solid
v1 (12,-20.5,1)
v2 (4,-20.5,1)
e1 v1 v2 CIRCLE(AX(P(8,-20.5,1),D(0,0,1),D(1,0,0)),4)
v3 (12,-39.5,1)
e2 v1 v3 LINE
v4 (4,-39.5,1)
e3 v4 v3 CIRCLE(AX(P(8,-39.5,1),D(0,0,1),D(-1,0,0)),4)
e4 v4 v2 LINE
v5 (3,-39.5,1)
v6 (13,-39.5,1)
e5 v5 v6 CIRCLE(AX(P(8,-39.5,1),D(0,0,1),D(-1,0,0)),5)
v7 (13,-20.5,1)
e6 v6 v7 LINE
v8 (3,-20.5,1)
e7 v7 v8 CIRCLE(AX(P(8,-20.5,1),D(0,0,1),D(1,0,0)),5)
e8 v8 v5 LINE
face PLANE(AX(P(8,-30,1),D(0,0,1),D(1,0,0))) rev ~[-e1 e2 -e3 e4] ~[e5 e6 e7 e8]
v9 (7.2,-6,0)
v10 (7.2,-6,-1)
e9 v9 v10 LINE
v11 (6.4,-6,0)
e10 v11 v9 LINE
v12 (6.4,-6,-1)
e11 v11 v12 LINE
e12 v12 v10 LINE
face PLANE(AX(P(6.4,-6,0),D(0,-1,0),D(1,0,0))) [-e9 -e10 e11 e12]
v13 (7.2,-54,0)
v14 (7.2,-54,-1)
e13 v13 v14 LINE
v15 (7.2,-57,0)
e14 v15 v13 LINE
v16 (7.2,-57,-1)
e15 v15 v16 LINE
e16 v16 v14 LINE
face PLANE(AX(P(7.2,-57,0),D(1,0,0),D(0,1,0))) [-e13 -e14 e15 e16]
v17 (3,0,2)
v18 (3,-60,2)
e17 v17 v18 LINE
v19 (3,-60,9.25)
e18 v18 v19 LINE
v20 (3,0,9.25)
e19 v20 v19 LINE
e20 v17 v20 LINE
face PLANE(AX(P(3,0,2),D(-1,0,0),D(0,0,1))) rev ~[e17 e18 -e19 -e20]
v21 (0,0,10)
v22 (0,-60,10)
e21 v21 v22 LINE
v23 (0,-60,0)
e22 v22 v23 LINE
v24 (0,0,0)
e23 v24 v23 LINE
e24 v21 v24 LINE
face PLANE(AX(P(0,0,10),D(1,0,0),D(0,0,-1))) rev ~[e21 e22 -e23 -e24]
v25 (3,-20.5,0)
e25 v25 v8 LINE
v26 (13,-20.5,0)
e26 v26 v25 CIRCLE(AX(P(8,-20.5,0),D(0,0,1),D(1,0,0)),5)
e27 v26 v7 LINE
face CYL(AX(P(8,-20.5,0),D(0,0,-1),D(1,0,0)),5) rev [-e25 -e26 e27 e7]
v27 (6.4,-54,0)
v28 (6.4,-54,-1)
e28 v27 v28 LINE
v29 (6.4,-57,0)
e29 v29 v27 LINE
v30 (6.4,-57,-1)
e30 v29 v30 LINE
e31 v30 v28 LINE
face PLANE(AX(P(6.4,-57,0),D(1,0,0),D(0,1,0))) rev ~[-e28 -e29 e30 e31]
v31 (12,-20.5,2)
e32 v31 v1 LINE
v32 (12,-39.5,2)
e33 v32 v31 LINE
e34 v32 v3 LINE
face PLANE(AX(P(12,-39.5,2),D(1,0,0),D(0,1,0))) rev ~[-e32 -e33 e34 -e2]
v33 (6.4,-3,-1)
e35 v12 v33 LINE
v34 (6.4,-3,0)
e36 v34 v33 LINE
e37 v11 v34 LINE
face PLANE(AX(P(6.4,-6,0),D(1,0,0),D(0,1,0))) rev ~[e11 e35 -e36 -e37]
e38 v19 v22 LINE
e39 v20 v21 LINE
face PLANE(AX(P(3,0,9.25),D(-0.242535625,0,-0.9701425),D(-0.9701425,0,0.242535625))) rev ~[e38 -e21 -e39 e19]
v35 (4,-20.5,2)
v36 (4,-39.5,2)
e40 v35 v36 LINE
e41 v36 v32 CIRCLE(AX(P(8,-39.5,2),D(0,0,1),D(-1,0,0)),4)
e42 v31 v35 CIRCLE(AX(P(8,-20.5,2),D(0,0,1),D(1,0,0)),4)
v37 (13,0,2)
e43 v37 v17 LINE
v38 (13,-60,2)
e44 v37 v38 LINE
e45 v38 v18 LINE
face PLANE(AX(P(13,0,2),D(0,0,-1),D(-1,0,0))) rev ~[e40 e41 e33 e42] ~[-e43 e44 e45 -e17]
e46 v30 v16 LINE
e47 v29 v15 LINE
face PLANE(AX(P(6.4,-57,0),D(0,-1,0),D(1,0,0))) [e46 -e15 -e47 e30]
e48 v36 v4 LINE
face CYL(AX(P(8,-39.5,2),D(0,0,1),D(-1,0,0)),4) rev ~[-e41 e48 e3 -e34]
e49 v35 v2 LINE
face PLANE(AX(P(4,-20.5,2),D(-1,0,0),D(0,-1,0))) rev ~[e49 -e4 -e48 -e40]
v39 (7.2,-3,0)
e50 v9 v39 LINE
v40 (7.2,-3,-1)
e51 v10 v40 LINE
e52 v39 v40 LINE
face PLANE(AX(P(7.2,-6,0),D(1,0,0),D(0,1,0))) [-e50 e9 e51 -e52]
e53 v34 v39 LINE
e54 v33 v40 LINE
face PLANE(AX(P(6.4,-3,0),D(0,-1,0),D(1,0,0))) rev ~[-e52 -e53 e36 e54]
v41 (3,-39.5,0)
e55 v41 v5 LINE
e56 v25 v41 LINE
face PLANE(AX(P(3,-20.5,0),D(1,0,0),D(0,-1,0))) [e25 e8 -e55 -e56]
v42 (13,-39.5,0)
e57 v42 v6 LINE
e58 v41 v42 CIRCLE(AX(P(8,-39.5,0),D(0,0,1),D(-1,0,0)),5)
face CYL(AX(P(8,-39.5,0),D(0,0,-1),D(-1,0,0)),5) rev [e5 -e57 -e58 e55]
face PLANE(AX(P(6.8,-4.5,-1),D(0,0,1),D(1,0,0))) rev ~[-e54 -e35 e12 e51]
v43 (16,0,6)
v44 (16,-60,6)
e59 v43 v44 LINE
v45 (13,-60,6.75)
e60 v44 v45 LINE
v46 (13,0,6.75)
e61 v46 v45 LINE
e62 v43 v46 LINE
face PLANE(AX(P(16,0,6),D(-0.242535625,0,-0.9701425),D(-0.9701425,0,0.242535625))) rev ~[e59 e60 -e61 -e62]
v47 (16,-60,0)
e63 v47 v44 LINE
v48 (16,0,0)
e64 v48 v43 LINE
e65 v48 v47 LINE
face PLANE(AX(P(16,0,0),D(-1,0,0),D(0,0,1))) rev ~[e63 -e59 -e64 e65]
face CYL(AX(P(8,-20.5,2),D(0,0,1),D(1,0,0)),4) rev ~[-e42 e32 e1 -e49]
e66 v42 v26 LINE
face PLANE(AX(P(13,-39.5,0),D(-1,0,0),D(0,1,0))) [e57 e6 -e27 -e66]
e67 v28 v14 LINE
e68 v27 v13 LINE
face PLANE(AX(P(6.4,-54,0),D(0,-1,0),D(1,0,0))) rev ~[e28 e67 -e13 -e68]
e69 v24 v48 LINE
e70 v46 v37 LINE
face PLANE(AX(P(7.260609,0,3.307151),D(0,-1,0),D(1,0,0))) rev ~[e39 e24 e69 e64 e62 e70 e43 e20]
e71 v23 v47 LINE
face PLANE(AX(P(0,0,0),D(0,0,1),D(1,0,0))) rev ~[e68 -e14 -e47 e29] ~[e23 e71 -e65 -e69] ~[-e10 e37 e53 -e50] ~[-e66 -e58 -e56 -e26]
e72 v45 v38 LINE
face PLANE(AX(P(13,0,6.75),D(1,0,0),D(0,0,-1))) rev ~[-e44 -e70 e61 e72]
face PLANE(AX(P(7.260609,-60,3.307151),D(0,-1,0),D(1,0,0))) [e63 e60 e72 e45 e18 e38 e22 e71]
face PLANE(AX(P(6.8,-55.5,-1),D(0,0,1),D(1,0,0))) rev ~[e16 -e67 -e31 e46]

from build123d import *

# Parameters (mm, degrees)
F1_DEPTH = 60
F3_DEPTH = 2.001
F5_DEPTH = 1
F6_W     = 0.8
F6_H     = 3
F7_DEPTH = 1


# Not quite as in the source:
# - a feature names something its author has since deleted; it is built from what else it names


with BuildPart() as f1:
    # F0 (on Front) → F1 (new body)
    with BuildSketch(Plane.XZ):
        Polygon((0, 10), (0, 0), (16, 0), (16, 6), (13, 6.75), (13, 2), (3, 2), (3, 9.25), align=None)
    extrude(amount=F1_DEPTH)

    # F2 (on face) → F3 (cut, through all)
    with BuildSketch(Plane.XY.offset(2)):
        with BuildLine():
            ThreePointArc((12, -20.5), (8, -16.5), (4, -20.5))
            Line((4, -20.5), (4, -39.5))
            ThreePointArc((4, -39.5), (8, -43.5), (12, -39.5))
            Line((12, -39.5), (12, -20.5))
        make_face()
    extrude(amount=-F3_DEPTH, mode=Mode.SUBTRACT)

    # F4 (on Top) → F5 (cut)
    with BuildSketch(Plane.XY):
        with BuildLine():
            ThreePointArc((13, -20.5), (8, -15.5), (3, -20.5))
            Line((3, -20.5), (3, -39.5))
            ThreePointArc((3, -39.5), (8, -44.5), (13, -39.5))
            Line((13, -39.5), (13, -20.5))
        make_face()
    extrude(amount=F5_DEPTH, mode=Mode.SUBTRACT)

    # F6 (on Top) → F7 (join)
    with BuildSketch(Plane.XY):
        with Locations((6.8, -4.5)):
            Rectangle(F6_W, F6_H)
        with Locations((6.8, -55.5)):
            Rectangle(F6_W, F6_H)
    extrude(amount=-F7_DEPTH)


solid = f1.part
